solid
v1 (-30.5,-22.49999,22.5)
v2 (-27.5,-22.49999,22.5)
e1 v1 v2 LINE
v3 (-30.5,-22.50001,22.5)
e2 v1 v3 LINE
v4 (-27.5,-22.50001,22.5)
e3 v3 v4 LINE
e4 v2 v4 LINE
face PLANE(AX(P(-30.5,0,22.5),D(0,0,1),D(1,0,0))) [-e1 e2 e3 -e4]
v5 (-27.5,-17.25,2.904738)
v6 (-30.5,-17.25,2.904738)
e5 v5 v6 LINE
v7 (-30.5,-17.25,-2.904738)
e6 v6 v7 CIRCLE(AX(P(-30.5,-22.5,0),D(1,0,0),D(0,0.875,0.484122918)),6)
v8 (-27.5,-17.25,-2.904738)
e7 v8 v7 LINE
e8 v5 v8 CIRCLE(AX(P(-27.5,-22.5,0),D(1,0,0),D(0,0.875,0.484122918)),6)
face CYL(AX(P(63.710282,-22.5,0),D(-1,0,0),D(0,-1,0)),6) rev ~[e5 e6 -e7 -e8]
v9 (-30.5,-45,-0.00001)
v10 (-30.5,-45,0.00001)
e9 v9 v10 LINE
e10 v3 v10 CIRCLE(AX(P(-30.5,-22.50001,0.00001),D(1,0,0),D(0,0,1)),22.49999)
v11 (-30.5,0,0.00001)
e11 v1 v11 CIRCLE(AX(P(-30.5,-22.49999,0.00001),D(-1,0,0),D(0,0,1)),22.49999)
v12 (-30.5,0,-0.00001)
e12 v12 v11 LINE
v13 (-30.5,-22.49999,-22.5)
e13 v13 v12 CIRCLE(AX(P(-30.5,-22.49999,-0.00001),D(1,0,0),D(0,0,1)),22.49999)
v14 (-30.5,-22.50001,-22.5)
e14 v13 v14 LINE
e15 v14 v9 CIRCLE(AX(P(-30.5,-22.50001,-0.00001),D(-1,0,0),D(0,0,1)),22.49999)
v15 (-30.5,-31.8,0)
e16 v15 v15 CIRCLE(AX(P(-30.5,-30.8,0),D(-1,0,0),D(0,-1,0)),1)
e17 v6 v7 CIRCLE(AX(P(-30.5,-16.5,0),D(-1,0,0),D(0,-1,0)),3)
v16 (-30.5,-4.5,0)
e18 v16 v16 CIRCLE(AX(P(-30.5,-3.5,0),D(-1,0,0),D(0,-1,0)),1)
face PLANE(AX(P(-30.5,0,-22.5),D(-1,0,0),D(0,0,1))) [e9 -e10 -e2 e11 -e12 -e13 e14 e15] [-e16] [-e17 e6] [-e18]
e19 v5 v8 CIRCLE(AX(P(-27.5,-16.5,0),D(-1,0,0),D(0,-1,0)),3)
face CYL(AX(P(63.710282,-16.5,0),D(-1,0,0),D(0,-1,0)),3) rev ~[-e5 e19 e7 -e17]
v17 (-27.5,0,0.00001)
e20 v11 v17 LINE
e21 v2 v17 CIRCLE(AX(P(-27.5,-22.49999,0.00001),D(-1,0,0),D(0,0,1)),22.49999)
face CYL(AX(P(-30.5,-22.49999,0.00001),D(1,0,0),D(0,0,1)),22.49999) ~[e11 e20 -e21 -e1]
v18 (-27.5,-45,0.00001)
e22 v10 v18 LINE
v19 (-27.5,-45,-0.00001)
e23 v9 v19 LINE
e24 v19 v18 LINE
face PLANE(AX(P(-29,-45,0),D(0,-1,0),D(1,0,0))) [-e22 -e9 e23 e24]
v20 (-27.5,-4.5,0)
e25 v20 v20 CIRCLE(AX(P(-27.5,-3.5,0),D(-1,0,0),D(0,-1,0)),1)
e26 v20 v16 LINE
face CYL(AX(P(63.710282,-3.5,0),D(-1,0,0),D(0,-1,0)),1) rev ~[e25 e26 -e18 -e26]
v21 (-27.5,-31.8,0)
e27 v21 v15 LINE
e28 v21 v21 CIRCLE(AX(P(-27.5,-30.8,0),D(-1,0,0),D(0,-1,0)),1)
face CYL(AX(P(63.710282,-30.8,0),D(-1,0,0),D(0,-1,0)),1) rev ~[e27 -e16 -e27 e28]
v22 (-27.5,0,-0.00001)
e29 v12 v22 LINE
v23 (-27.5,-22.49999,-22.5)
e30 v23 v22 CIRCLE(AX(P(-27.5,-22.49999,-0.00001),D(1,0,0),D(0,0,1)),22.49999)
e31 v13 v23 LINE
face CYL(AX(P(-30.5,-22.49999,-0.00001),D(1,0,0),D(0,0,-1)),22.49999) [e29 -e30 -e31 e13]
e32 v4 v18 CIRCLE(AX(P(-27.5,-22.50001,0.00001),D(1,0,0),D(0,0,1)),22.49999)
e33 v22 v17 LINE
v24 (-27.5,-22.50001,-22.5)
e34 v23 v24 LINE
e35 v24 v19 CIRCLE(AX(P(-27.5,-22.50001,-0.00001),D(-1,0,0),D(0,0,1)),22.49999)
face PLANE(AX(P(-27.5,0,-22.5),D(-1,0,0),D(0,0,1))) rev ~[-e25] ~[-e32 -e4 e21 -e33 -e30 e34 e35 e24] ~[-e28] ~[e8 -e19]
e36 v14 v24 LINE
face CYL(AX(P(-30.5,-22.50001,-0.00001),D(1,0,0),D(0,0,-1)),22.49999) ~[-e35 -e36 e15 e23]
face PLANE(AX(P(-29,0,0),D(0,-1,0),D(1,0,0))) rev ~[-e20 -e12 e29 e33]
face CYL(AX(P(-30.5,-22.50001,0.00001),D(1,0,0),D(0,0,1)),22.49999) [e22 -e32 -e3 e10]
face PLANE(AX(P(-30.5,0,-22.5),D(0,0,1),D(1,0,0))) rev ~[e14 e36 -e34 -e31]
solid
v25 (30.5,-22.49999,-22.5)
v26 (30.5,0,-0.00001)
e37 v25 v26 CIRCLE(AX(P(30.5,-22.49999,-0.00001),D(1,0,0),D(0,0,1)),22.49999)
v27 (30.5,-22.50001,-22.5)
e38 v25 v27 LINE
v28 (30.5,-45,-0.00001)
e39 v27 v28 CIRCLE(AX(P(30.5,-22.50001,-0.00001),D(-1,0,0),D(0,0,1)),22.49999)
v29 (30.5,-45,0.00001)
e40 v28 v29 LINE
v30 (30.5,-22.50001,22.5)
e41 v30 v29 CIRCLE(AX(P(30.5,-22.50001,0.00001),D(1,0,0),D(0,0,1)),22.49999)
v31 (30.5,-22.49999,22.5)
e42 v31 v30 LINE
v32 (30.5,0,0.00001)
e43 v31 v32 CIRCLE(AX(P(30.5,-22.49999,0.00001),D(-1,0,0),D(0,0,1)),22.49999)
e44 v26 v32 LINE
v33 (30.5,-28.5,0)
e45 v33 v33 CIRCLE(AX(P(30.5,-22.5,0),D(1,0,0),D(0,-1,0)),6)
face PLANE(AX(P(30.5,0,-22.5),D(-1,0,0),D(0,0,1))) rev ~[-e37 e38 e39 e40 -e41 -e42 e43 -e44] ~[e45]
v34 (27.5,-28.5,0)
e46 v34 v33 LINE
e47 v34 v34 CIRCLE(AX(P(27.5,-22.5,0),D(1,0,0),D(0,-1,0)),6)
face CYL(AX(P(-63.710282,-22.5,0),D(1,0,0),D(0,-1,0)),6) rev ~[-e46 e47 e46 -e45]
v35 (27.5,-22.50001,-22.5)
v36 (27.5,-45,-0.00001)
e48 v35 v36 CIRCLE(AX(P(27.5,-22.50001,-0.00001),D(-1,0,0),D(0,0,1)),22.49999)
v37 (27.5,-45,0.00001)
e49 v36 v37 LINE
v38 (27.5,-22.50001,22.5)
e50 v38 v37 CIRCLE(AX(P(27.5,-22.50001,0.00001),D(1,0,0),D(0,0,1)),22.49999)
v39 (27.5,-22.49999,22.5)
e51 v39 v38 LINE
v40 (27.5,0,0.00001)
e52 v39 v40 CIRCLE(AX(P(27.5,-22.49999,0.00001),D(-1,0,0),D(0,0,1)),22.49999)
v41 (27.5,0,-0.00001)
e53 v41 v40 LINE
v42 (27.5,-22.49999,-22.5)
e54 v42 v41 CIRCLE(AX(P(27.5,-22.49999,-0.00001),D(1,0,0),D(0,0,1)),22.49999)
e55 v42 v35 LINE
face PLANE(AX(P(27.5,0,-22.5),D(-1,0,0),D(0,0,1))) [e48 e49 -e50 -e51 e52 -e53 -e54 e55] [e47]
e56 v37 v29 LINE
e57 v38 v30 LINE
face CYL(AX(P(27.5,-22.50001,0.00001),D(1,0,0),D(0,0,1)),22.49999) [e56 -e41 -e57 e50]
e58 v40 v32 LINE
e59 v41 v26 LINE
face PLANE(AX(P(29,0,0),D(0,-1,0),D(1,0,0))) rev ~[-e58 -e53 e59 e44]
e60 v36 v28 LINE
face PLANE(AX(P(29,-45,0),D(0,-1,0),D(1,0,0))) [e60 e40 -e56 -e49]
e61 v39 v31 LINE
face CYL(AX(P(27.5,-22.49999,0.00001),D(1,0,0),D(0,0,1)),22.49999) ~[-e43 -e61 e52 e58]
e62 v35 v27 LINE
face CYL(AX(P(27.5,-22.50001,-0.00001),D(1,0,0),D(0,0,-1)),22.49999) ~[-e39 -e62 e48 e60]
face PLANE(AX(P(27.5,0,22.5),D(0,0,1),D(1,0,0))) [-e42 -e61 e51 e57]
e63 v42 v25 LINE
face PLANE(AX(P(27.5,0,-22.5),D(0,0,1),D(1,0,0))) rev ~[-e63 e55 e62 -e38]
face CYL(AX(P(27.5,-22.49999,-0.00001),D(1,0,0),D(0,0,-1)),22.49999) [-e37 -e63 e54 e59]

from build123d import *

# Parameters (mm, degrees)
F1_W     = 3
F1_H     = 45
F2_DEPTH = 45
F3_R     = 22.49999
F4_R     = 22.49999
F6_D     = 12
F7_D     = 12
F8_D     = 6
F9_D     = 2


# Not quite as in the source:
# - a fillet or chamfer is up to 0.001 mm smaller than in the source, because OpenCascade refuses the exact size


with BuildPart() as f2:
    # F1 (on Front) → F2 (new body)
    with BuildSketch(Plane.XZ):
        with Locations((-29, 0)):
            Rectangle(F1_W, F1_H)
    extrude(amount=F2_DEPTH)

    # F3 (radius 22.5 in the source; OpenCascade refuses exactly that, so slightly less here)
    f3_edges = [f2.edges().sort_by_distance(p)[0] for p in [
        (-29, -45, 22.5),
        (-29, -45, -22.5),
        (-29, 0, -22.5),
        (-29, 0, 22.5),
    ]]
    fillet(f3_edges, radius=F3_R)

    # F7 (through all)
    with Locations(Plane.YZ):
        with Locations((-22.5, 0)):
            Hole(F7_D / 2)

    # F8 (through all)
    with Locations(Plane.YZ):
        with Locations((-16.5, 0)):
            Hole(F8_D / 2)

    # F9 (through all)
    with Locations(Plane.YZ):
        with Locations((-3.5, 0), (-30.8, 0)):
            Hole(F9_D / 2)


with BuildPart() as f2b:
    # F1 (on Front) → F2, piece 2 (new body)
    with BuildSketch(Plane.XZ):
        with Locations((29, 0)):
            Rectangle(F1_W, F1_H)
    extrude(amount=F2_DEPTH)

    # F4 (radius 22.5 in the source; OpenCascade refuses exactly that, so slightly less here)
    f4_edges = [f2b.edges().sort_by_distance(p)[0] for p in [
        (29, -45, -22.5),
        (29, 0, -22.5),
        (29, 0, 22.5),
        (29, -45, 22.5),
    ]]
    fillet(f4_edges, radius=F4_R)

    # F6 (through all)
    with Locations(Plane(origin=(0, 0, 0), x_dir=(0, 1, 0), z_dir=(-1, 0, 0))):
        with Locations((-22.5, 0)):
            Hole(F6_D / 2)


solid = Compound([f2.part, f2b.part])
